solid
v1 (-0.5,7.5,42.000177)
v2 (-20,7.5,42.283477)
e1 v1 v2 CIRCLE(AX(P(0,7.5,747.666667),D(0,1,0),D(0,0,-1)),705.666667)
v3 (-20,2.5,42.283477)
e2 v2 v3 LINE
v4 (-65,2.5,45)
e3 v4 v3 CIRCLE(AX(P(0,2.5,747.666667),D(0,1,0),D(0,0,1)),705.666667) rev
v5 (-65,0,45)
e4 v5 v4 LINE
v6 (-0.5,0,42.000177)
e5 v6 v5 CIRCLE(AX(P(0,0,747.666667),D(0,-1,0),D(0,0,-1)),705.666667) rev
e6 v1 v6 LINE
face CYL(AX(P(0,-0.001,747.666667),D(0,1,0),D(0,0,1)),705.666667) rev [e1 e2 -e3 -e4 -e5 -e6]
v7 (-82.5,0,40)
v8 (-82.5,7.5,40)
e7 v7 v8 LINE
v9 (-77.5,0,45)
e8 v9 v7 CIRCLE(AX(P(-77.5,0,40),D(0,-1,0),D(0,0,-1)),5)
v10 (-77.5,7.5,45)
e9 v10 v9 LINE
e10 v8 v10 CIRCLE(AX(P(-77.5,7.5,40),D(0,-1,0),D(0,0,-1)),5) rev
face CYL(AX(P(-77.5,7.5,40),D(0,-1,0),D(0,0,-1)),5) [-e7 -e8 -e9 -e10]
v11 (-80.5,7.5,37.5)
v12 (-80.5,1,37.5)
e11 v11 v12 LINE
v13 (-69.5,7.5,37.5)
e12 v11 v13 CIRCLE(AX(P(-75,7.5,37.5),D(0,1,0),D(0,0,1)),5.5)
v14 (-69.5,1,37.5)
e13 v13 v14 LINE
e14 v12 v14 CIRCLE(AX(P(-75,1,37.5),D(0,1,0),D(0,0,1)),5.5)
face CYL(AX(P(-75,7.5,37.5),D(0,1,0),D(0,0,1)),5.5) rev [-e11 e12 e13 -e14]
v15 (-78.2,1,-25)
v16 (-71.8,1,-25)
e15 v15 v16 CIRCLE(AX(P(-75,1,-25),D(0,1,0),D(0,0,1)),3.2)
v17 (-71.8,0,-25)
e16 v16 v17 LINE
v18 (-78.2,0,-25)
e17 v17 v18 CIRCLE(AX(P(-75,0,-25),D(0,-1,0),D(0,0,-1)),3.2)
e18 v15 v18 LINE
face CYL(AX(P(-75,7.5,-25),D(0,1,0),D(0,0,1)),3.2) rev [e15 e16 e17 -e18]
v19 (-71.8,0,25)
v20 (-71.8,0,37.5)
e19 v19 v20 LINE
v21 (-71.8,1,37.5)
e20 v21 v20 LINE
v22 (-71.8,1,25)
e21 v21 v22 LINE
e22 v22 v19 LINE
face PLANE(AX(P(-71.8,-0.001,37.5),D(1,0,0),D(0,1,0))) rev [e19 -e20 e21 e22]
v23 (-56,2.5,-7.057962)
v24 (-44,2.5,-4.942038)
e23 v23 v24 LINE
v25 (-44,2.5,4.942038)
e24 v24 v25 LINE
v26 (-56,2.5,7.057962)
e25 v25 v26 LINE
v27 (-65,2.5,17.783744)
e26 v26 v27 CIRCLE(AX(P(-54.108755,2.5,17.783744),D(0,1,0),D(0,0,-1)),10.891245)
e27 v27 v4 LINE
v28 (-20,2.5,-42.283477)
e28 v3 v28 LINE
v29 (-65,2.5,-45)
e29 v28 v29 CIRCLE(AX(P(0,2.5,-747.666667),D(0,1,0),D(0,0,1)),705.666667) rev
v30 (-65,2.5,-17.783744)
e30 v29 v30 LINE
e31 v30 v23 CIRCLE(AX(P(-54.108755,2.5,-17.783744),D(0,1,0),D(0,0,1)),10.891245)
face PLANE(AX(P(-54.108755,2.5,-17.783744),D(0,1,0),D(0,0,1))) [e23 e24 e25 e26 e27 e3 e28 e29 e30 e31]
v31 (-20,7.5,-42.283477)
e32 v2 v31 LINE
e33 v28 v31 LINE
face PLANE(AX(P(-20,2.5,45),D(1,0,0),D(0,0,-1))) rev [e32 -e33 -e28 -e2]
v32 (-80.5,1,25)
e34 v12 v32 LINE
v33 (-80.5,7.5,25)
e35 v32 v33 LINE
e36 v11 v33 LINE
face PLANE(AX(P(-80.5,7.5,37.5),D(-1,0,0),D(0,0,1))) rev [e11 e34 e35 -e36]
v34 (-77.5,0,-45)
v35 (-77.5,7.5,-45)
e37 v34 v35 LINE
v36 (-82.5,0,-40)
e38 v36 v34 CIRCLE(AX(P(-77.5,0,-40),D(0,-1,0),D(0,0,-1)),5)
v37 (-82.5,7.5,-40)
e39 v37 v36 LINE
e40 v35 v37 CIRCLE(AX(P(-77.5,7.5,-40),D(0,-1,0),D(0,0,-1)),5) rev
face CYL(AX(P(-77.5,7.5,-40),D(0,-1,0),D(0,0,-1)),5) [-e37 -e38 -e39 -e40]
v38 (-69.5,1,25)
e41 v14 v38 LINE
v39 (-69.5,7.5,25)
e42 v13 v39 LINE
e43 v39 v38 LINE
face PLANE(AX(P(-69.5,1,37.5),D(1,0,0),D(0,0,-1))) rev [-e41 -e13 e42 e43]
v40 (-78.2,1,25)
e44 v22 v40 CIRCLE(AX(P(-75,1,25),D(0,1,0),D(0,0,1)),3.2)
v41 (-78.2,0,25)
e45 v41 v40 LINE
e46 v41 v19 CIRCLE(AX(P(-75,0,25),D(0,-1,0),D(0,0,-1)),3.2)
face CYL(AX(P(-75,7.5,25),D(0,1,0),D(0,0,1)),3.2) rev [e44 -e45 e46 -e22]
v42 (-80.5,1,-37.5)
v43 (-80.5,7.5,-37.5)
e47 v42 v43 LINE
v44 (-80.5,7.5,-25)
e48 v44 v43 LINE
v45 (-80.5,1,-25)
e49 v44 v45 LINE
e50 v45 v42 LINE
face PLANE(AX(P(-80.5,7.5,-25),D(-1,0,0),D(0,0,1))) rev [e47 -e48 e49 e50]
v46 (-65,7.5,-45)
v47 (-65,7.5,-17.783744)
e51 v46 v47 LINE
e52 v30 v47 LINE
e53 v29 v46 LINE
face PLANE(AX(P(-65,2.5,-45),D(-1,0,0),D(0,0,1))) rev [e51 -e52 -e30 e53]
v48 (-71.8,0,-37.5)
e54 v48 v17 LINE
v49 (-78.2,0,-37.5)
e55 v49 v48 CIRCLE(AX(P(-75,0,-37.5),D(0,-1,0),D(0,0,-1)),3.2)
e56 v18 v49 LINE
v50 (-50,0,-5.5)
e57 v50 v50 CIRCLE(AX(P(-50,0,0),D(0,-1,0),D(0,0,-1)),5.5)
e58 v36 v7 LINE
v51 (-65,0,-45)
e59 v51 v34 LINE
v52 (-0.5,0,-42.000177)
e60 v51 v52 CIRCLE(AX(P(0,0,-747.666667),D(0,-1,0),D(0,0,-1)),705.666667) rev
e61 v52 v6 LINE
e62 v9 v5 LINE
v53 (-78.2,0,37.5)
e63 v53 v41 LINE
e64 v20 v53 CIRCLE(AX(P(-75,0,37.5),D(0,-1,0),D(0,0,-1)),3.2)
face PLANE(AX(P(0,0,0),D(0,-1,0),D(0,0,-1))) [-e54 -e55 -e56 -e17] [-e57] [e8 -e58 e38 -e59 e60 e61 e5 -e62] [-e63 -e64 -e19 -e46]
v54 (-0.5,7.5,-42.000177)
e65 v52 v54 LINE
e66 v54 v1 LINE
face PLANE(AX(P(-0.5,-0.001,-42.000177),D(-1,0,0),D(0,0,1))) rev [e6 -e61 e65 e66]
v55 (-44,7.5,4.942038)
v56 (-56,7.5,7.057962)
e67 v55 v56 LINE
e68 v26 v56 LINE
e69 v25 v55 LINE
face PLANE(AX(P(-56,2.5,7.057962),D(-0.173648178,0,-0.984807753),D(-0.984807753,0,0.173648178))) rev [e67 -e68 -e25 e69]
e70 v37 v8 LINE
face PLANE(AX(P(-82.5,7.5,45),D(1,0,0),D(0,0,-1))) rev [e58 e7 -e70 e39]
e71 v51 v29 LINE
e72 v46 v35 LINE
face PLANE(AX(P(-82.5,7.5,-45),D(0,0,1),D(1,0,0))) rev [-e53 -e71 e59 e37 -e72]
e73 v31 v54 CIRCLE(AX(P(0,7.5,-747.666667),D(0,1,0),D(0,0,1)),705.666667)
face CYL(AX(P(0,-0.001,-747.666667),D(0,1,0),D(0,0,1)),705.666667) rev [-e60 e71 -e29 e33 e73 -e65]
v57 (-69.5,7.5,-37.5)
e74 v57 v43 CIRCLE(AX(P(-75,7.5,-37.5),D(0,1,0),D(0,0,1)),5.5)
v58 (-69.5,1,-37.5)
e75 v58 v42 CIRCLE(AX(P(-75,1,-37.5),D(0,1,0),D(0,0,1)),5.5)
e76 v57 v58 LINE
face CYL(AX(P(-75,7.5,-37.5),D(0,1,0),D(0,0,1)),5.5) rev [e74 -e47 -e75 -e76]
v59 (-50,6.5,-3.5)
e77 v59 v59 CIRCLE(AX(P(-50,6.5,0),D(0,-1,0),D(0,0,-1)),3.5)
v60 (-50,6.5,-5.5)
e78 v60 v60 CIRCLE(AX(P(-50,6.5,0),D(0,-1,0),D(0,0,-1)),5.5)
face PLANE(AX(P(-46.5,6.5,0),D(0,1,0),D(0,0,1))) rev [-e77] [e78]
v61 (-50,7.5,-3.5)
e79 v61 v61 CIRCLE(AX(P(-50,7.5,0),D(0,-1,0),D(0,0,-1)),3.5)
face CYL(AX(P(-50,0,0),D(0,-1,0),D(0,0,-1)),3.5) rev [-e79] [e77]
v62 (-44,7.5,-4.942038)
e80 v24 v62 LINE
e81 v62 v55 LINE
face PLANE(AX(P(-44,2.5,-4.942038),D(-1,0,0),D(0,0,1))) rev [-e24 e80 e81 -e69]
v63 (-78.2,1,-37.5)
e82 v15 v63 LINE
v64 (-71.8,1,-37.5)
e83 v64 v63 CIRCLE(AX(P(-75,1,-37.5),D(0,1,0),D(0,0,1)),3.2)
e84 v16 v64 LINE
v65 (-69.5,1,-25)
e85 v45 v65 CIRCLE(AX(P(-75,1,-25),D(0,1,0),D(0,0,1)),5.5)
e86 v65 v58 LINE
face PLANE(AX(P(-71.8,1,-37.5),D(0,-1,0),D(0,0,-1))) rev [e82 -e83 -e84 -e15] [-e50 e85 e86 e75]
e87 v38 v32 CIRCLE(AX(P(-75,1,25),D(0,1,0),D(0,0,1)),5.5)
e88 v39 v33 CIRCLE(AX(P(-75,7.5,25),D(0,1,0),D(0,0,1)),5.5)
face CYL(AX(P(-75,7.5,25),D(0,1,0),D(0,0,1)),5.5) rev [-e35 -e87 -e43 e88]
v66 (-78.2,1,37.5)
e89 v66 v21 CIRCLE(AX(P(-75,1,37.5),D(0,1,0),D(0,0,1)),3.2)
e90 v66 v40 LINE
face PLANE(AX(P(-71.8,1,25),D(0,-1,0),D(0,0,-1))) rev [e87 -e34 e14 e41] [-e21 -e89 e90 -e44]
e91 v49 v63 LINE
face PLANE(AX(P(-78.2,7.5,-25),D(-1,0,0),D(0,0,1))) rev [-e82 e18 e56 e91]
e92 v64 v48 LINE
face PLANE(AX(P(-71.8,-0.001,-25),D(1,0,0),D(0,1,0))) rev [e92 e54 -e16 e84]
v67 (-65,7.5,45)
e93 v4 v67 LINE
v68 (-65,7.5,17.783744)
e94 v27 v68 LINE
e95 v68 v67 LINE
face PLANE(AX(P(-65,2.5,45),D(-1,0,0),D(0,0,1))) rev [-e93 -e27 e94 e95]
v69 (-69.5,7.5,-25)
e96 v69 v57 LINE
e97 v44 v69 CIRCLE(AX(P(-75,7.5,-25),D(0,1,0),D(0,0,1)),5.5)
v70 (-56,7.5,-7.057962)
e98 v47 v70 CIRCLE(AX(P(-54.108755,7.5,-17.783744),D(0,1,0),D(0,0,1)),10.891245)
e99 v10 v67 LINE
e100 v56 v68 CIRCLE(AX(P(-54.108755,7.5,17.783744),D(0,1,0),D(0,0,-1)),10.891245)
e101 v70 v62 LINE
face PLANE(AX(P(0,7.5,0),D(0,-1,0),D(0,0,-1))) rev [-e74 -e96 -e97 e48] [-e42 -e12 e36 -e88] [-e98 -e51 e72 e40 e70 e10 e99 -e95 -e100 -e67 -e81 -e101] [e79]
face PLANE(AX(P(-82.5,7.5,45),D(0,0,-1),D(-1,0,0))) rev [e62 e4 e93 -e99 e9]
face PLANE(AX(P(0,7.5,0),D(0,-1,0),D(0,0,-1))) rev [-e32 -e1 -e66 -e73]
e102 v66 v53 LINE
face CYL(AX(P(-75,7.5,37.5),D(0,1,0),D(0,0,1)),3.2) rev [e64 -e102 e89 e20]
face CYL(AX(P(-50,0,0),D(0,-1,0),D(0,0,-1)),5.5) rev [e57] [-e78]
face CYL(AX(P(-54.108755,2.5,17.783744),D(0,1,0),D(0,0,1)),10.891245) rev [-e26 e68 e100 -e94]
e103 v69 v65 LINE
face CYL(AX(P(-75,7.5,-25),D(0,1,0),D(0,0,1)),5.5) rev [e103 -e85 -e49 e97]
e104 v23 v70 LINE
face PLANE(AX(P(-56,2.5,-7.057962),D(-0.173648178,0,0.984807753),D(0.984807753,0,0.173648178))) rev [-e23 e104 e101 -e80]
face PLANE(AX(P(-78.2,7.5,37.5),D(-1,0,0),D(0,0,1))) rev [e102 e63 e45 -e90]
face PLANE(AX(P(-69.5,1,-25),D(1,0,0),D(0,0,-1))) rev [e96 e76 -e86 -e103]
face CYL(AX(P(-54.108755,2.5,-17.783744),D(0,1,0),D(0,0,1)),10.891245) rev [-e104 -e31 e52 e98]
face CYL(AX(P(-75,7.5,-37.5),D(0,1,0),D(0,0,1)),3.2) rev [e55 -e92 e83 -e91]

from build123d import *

# Parameters (mm, degrees)
SKETCH1_W                                           = 165
SKETCH1_H                                           = 90
BOSS_EXTRUDE1_DEPTH                                 = 7.5
CUT_EXTRUDE2_REACH                                  = 96.274
CBORE_START                                         = 1
CBORE_SLOT_FOR_M6_HEX_SOCKET_HEAD_CAP_SC_DEPTH      = 6.5
CBORE_SLOT_FOR_M6_HEX_SOCKET_HEAD_CA_3_DEPTH        = 1
FILLET1_R                                           = 5
CBORE_FOR_M6_HEX_SOCKET_HEAD_CAP_SCREW1_D           = 7
CBORE_FOR_M6_HEX_SOCKET_HEAD_CAP_SCREW1_CBORE_D     = 11
CBORE_FOR_M6_HEX_SOCKET_HEAD_CAP_SCREW1_CBORE_DEPTH = 6.5
CUT_EXTRUDE3_DEPTH                                  = 5
CUT_EXTRUDE4_REACH                                  = 96.274
SKETCH13_W                                          = 82.5
SKETCH13_H                                          = 90
CUT_EXTRUDE5_REACH                                  = 96.274
SKETCH14_W                                          = 0.5
SKETCH14_H                                          = 84.000354274


# Read off the part's stored shape, not the designer's step: CBORE SLOT for M6 Hex Socket Head Cap Screw1
with BuildPart() as part:
    # Sketch1 → Boss-Extrude1 (new body)
    with BuildSketch(Plane(origin=(0, 0, 0), x_dir=(1, 0, 0), z_dir=(0, 1, 0))):
        Rectangle(SKETCH1_W, SKETCH1_H)
    extrude(amount=BOSS_EXTRUDE1_DEPTH)

    # Sketch7 → Cut-Extrude2 (cut, up to next)
    with BuildSketch(Plane(origin=(0, 7.5, 0), x_dir=(1, 0, 0), z_dir=(0, 1, 0)), mode=Mode.PRIVATE) as cut_extrude2_sk1:
        with BuildLine():
            Line((-65, 45), (65, 45))
            ThreePointArc((65, 45), (0, 42), (-65, 45))
        make_face()
    cut_extrude2_tool1 = extrude(cut_extrude2_sk1.sketch, amount=-CUT_EXTRUDE2_REACH, mode=Mode.PRIVATE) & part.part
    # Sketch7 → Cut-Extrude2 (cut, up to next)
    with BuildSketch(Plane(origin=(0, 7.5, 0), x_dir=(1, 0, 0), z_dir=(0, 1, 0)), mode=Mode.PRIVATE) as cut_extrude2_sk2:
        with BuildLine():
            Line((-65, -45), (65, -45))
            ThreePointArc((65, -45), (0, -42), (-65, -45))
        make_face()
    cut_extrude2_tool2 = extrude(cut_extrude2_sk2.sketch, amount=-CUT_EXTRUDE2_REACH, mode=Mode.PRIVATE) & part.part
    add(cut_extrude2_tool1.solids().sort_by_distance((0, 7.5, -43.799781))[0], mode=Mode.SUBTRACT)
    add(cut_extrude2_tool2.solids().sort_by_distance((0, 7.5, 43.799781))[0], mode=Mode.SUBTRACT)

    # CBORE SLOT for M6 Hex Socket Head Ca 2 → CBORE SLOT for M6 Hex Socket Head Cap Screw1 (cut)
    with BuildSketch(Plane(origin=(0, 0, 0), x_dir=(1, 0, 0), z_dir=(0, 1, 0)).offset(CBORE_START)):
        with BuildLine():
            Line((80.5, -37.5), (80.5, -25))
            ThreePointArc((80.5, -25), (75, -19.5), (69.5, -25))
            Line((69.5, -25), (69.5, -37.5))
            ThreePointArc((69.5, -37.5), (75, -43), (80.5, -37.5))
        make_face()
        with BuildLine():
            ThreePointArc((80.5, 37.5), (75, 43), (69.5, 37.5))
            Line((69.5, 37.5), (69.5, 25))
            ThreePointArc((69.5, 25), (75, 19.5), (80.5, 25))
            Line((80.5, 25), (80.5, 37.5))
        make_face()
        with BuildLine():
            Line((-69.5, -37.5), (-69.5, -25))
            ThreePointArc((-69.5, -25), (-75, -19.5), (-80.5, -25))
            Line((-80.5, -25), (-80.5, -37.5))
            ThreePointArc((-80.5, -37.5), (-75, -43), (-69.5, -37.5))
        make_face()
        with BuildLine():
            ThreePointArc((-69.5, 37.5), (-75, 43), (-80.5, 37.5))
            Line((-80.5, 37.5), (-80.5, 25))
            ThreePointArc((-80.5, 25), (-75, 19.5), (-69.5, 25))
            Line((-69.5, 25), (-69.5, 37.5))
        make_face()
    extrude(amount=CBORE_SLOT_FOR_M6_HEX_SOCKET_HEAD_CAP_SC_DEPTH, mode=Mode.SUBTRACT)

    # CBORE SLOT for M6 Hex Socket Head Ca 3 o → CBORE SLOT for M6 Hex Socket Head Ca 3 (cut)
    with BuildSketch(Plane(origin=(0, 0, 0), x_dir=(1, 0, 0), z_dir=(0, 1, 0))):
        with BuildLine():
            Line((78.2, -37.5), (78.2, -25))
            ThreePointArc((78.2, -25), (75, -21.8), (71.8, -25))
            Line((71.8, -25), (71.8, -37.5))
            ThreePointArc((71.8, -37.5), (75, -40.7), (78.2, -37.5))
        make_face()
        with BuildLine():
            ThreePointArc((78.2, 37.5), (75, 40.7), (71.8, 37.5))
            Line((71.8, 37.5), (71.8, 25))
            ThreePointArc((71.8, 25), (75, 21.8), (78.2, 25))
            Line((78.2, 25), (78.2, 37.5))
        make_face()
        with BuildLine():
            Line((-71.8, -37.5), (-71.8, -25))
            ThreePointArc((-71.8, -25), (-75, -21.8), (-78.2, -25))
            Line((-78.2, -25), (-78.2, -37.5))
            ThreePointArc((-78.2, -37.5), (-75, -40.7), (-71.8, -37.5))
        make_face()
        with BuildLine():
            ThreePointArc((-71.8, 37.5), (-75, 40.7), (-78.2, 37.5))
            Line((-78.2, 37.5), (-78.2, 25))
            ThreePointArc((-78.2, 25), (-75, 21.8), (-71.8, 25))
            Line((-71.8, 25), (-71.8, 37.5))
        make_face()
    extrude(amount=CBORE_SLOT_FOR_M6_HEX_SOCKET_HEAD_CA_3_DEPTH, mode=Mode.SUBTRACT)

    # Fillet1
    fillet1_edges = [part.edges().sort_by_distance(p)[0] for p in [
        (82.5, 3.75, 45),
        (-82.5, 3.75, 45),
        (-82.5, 3.75, -45),
        (82.5, 3.75, -45),
    ]]
    fillet(fillet1_edges, radius=FILLET1_R)

    # CBORE for M6 Hex Socket Head Cap Screw1 (through all)
    with Locations(Plane.XZ):
        with Locations((-50, 0), (50, 0)):
            CounterBoreHole(CBORE_FOR_M6_HEX_SOCKET_HEAD_CAP_SCREW1_D / 2, CBORE_FOR_M6_HEX_SOCKET_HEAD_CAP_SCREW1_CBORE_D / 2, CBORE_FOR_M6_HEX_SOCKET_HEAD_CAP_SCREW1_CBORE_DEPTH)

    # Sketch12 → Cut-Extrude3 (cut)
    with BuildSketch(Plane(origin=(0, 7.5, 0), x_dir=(1, 0, 0), z_dir=(0, 1, 0))):
        with BuildLine():
            Line((-65, 45), (-65, 17.783744218))
            ThreePointArc((-65, 17.783744218), (-62.451932754, 10.782986997), (-56, 7.057961884))
            Line((-56, 7.057961884), (-44, 4.942038116))
            Line((-44, 4.942038116), (-44, -4.942038116))
            Line((-44, -4.942038116), (-56, -7.057961884))
            ThreePointArc((-56, -7.057961884), (-62.451932754, -10.782986997), (-65, -17.783744218))
            Line((-65, -17.783744218), (-65, -45))
            Line((-65, -45), (-20, -45))
            Line((-20, -45), (-20, 45))
            Line((-20, 45), (-65, 45))
        make_face()
        with BuildLine():
            Line((44, 4.942038116), (44, -4.942038116))
            Line((44, -4.942038116), (56, -7.057961884))
            ThreePointArc((56, -7.057961884), (62.451932754, -10.782986997), (65, -17.783744218))
            Line((65, -17.783744218), (65, -45))
            Line((65, -45), (20, -45))
            Line((20, -45), (20, 45))
            Line((20, 45), (65, 45))
            Line((65, 45), (65, 17.783744218))
            ThreePointArc((65, 17.783744218), (62.451932754, 10.782986997), (56, 7.057961884))
            Line((56, 7.057961884), (44, 4.942038116))
        make_face()
    extrude(amount=-CUT_EXTRUDE3_DEPTH, mode=Mode.SUBTRACT)

    # Sketch13 → Cut-Extrude4 (cut, up to next)
    with BuildSketch(Plane(origin=(0, 7.5, 0), x_dir=(1, 0, 0), z_dir=(0, 1, 0)), mode=Mode.PRIVATE) as cut_extrude4_sk1:
        with Locations((41.25, 0)):
            Rectangle(SKETCH13_W, SKETCH13_H)
    cut_extrude4_tool1 = extrude(cut_extrude4_sk1.sketch, amount=-CUT_EXTRUDE4_REACH, mode=Mode.PRIVATE) & part.part
    add(cut_extrude4_tool1.solids().sort_by_distance((41.25, 7.5, 0))[0], mode=Mode.SUBTRACT)

    # Sketch14 → Cut-Extrude5 (cut, up to next)
    with BuildSketch(Plane(origin=(0, 7.5, 0), x_dir=(1, 0, 0), z_dir=(0, 1, 0)), mode=Mode.PRIVATE) as cut_extrude5_sk1:
        with Locations((-0.25, 0)):
            Rectangle(SKETCH14_W, SKETCH14_H)
    cut_extrude5_tool1 = extrude(cut_extrude5_sk1.sketch, amount=-CUT_EXTRUDE5_REACH, mode=Mode.PRIVATE) & part.part
    add(cut_extrude5_tool1.solids().sort_by_distance((-0.25, 7.5, 0))[0], mode=Mode.SUBTRACT)


solid = part.part
